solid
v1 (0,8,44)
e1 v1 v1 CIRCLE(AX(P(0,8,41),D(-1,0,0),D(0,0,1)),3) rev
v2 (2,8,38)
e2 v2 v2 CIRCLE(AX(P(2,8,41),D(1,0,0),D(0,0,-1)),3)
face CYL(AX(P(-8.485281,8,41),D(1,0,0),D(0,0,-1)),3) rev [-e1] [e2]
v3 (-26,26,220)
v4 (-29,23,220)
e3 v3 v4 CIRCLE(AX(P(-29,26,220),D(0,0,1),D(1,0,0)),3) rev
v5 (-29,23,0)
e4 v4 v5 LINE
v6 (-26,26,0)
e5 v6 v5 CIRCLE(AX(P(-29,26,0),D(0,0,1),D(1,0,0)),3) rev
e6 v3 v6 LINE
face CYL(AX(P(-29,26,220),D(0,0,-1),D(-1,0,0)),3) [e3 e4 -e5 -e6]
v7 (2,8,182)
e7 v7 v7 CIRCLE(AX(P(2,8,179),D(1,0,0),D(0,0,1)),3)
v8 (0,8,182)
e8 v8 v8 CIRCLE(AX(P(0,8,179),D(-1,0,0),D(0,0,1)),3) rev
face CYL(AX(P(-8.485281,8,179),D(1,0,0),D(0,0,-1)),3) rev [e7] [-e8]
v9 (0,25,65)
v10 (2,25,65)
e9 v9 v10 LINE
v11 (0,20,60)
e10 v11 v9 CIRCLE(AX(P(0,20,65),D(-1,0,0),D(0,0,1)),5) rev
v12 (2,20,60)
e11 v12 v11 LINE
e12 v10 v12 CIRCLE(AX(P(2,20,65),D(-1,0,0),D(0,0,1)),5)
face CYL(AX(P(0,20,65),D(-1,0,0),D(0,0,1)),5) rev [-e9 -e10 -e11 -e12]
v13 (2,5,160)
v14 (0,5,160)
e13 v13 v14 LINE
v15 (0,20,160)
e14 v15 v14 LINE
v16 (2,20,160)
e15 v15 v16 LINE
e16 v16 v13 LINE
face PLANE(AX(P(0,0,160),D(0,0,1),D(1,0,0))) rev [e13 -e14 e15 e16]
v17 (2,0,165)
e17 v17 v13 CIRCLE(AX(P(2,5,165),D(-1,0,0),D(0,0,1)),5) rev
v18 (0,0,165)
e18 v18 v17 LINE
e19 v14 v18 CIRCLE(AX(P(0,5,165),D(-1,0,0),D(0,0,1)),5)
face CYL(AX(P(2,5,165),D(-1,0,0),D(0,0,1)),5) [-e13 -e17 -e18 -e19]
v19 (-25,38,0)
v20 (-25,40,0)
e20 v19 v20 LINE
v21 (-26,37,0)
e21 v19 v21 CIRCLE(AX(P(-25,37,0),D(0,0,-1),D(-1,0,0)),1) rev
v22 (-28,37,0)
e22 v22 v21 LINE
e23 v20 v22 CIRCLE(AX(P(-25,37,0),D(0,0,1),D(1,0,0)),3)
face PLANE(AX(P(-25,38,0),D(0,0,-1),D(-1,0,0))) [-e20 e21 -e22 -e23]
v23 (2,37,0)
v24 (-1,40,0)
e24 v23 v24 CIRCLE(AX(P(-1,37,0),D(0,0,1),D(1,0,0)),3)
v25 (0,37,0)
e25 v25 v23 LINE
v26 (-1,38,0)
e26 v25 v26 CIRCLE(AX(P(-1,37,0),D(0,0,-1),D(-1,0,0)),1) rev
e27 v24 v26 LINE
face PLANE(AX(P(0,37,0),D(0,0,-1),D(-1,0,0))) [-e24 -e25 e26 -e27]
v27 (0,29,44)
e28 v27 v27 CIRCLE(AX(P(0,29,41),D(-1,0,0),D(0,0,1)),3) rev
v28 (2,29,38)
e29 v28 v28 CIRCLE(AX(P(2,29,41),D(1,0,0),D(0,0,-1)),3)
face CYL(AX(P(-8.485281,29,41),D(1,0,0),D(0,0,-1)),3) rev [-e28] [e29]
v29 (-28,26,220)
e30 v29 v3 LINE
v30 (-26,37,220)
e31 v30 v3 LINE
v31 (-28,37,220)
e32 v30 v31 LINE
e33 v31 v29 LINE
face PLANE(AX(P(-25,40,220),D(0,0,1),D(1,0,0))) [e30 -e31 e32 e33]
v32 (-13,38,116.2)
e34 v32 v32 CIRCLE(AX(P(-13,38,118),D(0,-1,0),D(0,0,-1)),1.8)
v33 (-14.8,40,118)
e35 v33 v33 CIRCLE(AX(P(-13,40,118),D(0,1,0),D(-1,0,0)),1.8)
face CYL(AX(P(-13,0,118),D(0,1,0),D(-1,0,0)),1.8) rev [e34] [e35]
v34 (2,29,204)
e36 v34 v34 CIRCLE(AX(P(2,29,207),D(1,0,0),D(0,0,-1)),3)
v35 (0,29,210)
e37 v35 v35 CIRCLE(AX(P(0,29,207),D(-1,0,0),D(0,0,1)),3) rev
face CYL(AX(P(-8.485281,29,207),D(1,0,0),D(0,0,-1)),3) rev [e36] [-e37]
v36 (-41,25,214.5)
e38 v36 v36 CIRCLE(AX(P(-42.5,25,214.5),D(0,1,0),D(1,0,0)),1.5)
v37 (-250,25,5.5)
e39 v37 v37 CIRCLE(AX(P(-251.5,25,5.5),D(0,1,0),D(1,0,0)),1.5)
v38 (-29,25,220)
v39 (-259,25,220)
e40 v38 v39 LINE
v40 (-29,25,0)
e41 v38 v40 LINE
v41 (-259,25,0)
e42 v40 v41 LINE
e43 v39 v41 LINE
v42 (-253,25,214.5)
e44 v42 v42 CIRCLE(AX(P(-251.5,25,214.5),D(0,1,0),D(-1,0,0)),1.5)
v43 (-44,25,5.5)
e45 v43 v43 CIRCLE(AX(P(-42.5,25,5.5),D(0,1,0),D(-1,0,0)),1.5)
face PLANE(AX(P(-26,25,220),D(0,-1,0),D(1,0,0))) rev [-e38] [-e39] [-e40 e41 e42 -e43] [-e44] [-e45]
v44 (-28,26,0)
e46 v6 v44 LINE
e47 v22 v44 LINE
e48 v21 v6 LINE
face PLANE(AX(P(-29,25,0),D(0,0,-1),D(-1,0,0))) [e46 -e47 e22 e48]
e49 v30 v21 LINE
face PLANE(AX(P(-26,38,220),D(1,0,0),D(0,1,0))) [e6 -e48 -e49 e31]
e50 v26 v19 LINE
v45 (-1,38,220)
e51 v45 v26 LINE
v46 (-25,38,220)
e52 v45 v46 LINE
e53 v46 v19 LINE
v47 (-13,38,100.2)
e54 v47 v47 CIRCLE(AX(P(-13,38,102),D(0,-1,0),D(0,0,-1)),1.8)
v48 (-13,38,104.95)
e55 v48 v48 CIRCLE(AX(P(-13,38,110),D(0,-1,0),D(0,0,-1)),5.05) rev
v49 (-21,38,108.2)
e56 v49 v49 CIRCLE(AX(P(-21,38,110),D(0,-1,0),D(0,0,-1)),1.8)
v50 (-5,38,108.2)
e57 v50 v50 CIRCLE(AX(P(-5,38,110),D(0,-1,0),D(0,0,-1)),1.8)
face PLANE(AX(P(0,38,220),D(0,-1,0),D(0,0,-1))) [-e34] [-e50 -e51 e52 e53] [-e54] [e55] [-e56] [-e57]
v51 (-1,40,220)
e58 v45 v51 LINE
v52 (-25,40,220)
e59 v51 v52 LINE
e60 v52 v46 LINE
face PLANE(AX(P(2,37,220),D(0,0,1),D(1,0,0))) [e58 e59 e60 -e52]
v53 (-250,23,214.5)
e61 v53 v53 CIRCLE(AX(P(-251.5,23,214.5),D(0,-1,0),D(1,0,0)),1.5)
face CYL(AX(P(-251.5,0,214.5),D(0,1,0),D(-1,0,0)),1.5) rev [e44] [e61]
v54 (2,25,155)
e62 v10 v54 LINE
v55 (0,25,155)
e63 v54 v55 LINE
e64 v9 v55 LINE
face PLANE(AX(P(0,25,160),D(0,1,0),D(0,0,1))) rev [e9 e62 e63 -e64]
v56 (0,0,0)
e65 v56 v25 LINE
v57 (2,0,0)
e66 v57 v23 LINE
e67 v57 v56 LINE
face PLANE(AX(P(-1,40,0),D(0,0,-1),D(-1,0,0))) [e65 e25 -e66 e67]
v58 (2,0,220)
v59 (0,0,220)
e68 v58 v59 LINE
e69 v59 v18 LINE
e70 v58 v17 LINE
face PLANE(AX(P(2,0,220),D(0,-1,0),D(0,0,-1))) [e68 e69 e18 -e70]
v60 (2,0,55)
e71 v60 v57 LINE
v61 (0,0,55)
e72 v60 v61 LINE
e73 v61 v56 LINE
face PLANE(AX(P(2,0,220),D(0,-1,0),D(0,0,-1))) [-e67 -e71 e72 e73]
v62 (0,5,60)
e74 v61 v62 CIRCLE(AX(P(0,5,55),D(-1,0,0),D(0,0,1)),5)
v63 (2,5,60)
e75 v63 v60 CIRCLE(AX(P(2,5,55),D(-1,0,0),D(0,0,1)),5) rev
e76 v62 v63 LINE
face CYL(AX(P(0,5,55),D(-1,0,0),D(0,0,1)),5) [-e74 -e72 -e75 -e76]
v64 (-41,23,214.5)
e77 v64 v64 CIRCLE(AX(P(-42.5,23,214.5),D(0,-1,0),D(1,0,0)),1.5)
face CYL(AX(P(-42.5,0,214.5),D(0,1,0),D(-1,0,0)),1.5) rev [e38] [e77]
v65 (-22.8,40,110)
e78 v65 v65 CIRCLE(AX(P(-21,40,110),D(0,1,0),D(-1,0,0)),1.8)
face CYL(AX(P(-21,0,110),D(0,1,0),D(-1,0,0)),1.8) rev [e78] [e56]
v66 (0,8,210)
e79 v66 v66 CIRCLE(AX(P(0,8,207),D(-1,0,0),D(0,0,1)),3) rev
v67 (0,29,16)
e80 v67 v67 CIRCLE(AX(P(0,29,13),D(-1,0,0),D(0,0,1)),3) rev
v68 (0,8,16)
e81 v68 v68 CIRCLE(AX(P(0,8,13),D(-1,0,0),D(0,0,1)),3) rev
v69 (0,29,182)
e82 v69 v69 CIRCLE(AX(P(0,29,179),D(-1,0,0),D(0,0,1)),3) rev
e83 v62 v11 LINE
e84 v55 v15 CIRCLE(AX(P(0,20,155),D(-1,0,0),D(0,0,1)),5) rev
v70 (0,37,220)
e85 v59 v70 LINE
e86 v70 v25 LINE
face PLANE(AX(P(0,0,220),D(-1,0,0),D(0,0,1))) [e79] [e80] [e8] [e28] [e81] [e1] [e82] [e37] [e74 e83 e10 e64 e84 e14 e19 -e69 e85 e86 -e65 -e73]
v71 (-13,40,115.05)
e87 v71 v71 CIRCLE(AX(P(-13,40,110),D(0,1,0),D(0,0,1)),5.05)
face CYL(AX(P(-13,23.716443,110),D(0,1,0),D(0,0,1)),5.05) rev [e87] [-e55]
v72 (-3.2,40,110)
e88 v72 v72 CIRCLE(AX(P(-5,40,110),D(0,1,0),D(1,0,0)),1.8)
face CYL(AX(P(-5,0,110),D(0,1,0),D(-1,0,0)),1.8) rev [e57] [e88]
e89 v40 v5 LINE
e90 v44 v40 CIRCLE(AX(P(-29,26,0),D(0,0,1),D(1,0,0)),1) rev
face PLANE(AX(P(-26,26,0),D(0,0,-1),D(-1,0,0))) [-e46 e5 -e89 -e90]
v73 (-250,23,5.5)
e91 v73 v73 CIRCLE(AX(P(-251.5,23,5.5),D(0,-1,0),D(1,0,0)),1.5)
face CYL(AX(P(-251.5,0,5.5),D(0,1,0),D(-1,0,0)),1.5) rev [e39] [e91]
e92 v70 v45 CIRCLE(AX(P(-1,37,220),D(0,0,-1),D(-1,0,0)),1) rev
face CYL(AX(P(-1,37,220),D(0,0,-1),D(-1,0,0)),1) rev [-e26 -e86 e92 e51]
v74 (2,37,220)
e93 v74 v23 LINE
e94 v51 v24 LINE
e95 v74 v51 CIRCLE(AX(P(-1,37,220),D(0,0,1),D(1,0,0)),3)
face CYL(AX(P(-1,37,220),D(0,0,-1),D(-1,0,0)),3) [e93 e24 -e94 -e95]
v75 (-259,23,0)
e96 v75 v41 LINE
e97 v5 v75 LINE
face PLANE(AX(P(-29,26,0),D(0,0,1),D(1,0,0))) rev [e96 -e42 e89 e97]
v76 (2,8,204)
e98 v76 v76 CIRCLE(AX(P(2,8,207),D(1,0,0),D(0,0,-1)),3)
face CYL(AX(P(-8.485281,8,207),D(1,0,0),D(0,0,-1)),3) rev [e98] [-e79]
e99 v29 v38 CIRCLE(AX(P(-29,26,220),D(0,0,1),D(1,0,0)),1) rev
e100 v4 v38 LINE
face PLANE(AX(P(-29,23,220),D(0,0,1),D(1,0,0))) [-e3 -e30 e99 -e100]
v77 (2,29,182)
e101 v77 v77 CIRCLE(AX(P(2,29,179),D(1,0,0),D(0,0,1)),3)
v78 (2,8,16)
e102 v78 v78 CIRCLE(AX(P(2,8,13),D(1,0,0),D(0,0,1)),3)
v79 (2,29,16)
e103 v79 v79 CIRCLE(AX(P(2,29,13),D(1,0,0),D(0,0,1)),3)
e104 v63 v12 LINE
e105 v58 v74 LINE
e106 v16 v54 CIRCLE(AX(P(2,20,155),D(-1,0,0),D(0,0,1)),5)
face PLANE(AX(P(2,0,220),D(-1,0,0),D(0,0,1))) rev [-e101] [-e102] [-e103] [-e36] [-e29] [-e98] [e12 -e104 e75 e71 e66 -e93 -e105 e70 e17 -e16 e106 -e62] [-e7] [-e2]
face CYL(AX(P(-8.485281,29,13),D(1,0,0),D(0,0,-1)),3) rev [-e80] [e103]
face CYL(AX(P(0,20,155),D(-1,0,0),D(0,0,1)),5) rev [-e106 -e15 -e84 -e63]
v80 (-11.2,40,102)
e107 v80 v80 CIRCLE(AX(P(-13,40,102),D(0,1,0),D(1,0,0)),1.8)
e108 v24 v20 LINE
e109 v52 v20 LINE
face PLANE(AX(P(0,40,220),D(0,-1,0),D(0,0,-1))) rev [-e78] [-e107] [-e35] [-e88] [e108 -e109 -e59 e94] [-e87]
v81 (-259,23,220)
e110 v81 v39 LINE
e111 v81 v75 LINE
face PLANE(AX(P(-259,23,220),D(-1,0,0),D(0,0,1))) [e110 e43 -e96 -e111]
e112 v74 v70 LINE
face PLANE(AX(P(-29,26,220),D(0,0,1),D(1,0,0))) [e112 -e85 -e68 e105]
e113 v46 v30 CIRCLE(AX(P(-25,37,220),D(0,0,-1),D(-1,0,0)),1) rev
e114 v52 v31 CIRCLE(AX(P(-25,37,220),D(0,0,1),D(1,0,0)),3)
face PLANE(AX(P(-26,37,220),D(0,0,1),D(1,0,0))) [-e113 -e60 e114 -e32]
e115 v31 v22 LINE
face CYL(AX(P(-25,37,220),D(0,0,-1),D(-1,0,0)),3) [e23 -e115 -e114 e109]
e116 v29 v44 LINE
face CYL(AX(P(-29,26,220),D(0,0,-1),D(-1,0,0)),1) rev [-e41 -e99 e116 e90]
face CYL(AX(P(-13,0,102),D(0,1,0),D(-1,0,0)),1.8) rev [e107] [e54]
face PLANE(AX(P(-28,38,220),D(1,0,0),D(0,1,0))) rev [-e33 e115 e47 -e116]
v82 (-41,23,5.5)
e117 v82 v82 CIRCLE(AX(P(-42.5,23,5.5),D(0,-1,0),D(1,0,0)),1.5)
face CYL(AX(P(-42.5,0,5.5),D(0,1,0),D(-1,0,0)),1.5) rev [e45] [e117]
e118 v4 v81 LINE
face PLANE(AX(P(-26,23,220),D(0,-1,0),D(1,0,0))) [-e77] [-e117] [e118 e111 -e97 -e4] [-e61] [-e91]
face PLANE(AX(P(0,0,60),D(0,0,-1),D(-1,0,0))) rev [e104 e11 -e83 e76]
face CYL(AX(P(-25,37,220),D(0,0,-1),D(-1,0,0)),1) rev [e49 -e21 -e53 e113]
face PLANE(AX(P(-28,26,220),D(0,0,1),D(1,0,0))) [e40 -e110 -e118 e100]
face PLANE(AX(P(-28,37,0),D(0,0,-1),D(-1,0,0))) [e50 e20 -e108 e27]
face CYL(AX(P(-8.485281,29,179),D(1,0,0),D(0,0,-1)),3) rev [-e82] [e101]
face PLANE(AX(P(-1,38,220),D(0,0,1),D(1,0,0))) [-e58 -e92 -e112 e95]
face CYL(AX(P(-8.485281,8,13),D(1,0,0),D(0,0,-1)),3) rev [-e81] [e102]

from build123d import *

# Parameters (mm, degrees)
BASE_FLANGE1_DEPTH = 220
SKETCH6_R          = 1.8
CUT_EXTRUDE1_DEPTH = 343.171009877
SKETCH7_R          = 1.5
CUT_EXTRUDE2_DEPTH = 341.743305143
SKETCH8_R          = 3
CUT_EXTRUDE3_DEPTH = 2
SKETCH10_W         = 100
SKETCH10_H         = 25
CUT_EXTRUDE8_DEPTH = 2
FILLET1_R          = 5
SKETCH11_R         = 5.05
CUT_EXTRUDE9_DEPTH = 2


# Sheet-metal steps are written as plain solids
with BuildPart() as part:
    # Sketch1 → Base-Flange1 (new body)
    with BuildSketch(Plane.XY):
        with BuildLine():
            Line((0, 0), (0, 37))
            ThreePointArc((0, 37), (-0.292893219, 37.707106781), (-1, 38))
            Line((-1, 38), (-25, 38))
            ThreePointArc((-25, 38), (-25.707106781, 37.707106781), (-26, 37))
            Line((-26, 37), (-26, 26))
            ThreePointArc((-26, 26), (-26.878679656, 23.878679656), (-29, 23))
            Line((-29, 23), (-259, 23))
            Line((-259, 23), (-259, 25))
            Line((-259, 25), (-29, 25))
            ThreePointArc((-29, 25), (-28.292893219, 25.292893219), (-28, 26))
            Line((-28, 26), (-28, 37))
            ThreePointArc((-28, 37), (-27.121320344, 39.121320344), (-25, 40))
            Line((-25, 40), (-1, 40))
            ThreePointArc((-1, 40), (1.121320344, 39.121320344), (2, 37))
            Line((2, 37), (2, 0))
            Line((2, 0), (0, 0))
        make_face()
    extrude(amount=BASE_FLANGE1_DEPTH)

    # Sketch6 → Cut-Extrude1 (cut, through all)
    with BuildSketch(Plane(origin=(0, 40, 0), x_dir=(1, 0, 0), z_dir=(0, 1, 0))):
        with Locations(Location((-21, -110, 0), (0, 0, 180))):
            Circle(SKETCH6_R)
        with Locations(Location((-5, -110, 0), (0, 0, 90))):
            Circle(SKETCH6_R)
        with Locations(Location((-13, -118, 0), (0, 0, 180))):
            Circle(SKETCH6_R)
        with Locations(Location((-13, -102, 0), (0, 0, 90))):
            Circle(SKETCH6_R)
    extrude(amount=-CUT_EXTRUDE1_DEPTH, mode=Mode.SUBTRACT)

    # Sketch7 → Cut-Extrude2 (cut, through all)
    with BuildSketch(Plane(origin=(0, 25, 0), x_dir=(1, 0, 0), z_dir=(0, 1, 0))):
        with Locations(Location((-42.5, -5.5, 0), (0, 0, 180))):
            Circle(SKETCH7_R)
        with Locations((-251.5, -5.5)):
            Circle(SKETCH7_R)
        with Locations(Location((-251.5, -214.5, 0), (0, 0, 180))):
            Circle(SKETCH7_R)
        with Locations((-42.5, -214.5)):
            Circle(SKETCH7_R)
    extrude(amount=-CUT_EXTRUDE2_DEPTH, mode=Mode.SUBTRACT)

    # Sketch8 → Cut-Extrude3 (cut)
    with BuildSketch(Plane(origin=(2, 0, 0), x_dir=(0, 0, -1), z_dir=(1, 0, 0))):
        with Locations((-207, 8)):
            Circle(SKETCH8_R)
        with Locations((-207, 29)):
            Circle(SKETCH8_R)
        with Locations(Location((-179, 29, 0), (0, 0, 180))):
            Circle(SKETCH8_R)
        with Locations(Location((-179, 8, 0), (0, 0, 180))):
            Circle(SKETCH8_R)
        with Locations((-41, 8)):
            Circle(SKETCH8_R)
        with Locations((-41, 29)):
            Circle(SKETCH8_R)
        with Locations(Location((-13, 29, 0), (0, 0, 180))):
            Circle(SKETCH8_R)
        with Locations(Location((-13, 8, 0), (0, 0, 180))):
            Circle(SKETCH8_R)
    extrude(amount=-CUT_EXTRUDE3_DEPTH, mode=Mode.SUBTRACT)

    # Sketch10 → Cut-Extrude8 (cut)
    with BuildSketch(Plane(origin=(2, 0, 0), x_dir=(0, 0, -1), z_dir=(1, 0, 0))):
        with Locations((-110, 12.5)):
            Rectangle(SKETCH10_W, SKETCH10_H)
    extrude(amount=-CUT_EXTRUDE8_DEPTH, mode=Mode.SUBTRACT)

    # Fillet1
    fillet1_edges = [part.edges().sort_by_distance(p)[0] for p in [
        (1, 0, 60),
        (1, 0, 160),
        (1, 25, 160),
        (1, 25, 60),
    ]]
    fillet(fillet1_edges, radius=FILLET1_R)

    # Sketch11 → Cut-Extrude9 (cut)
    with BuildSketch(Plane(origin=(0, 40, 0), x_dir=(1, 0, 0), z_dir=(0, 1, 0))):
        with Locations(Location((-13, -110, 0), (0, 0, 270))):
            Circle(SKETCH11_R)
    extrude(amount=-CUT_EXTRUDE9_DEPTH, mode=Mode.SUBTRACT)


solid = part.part
